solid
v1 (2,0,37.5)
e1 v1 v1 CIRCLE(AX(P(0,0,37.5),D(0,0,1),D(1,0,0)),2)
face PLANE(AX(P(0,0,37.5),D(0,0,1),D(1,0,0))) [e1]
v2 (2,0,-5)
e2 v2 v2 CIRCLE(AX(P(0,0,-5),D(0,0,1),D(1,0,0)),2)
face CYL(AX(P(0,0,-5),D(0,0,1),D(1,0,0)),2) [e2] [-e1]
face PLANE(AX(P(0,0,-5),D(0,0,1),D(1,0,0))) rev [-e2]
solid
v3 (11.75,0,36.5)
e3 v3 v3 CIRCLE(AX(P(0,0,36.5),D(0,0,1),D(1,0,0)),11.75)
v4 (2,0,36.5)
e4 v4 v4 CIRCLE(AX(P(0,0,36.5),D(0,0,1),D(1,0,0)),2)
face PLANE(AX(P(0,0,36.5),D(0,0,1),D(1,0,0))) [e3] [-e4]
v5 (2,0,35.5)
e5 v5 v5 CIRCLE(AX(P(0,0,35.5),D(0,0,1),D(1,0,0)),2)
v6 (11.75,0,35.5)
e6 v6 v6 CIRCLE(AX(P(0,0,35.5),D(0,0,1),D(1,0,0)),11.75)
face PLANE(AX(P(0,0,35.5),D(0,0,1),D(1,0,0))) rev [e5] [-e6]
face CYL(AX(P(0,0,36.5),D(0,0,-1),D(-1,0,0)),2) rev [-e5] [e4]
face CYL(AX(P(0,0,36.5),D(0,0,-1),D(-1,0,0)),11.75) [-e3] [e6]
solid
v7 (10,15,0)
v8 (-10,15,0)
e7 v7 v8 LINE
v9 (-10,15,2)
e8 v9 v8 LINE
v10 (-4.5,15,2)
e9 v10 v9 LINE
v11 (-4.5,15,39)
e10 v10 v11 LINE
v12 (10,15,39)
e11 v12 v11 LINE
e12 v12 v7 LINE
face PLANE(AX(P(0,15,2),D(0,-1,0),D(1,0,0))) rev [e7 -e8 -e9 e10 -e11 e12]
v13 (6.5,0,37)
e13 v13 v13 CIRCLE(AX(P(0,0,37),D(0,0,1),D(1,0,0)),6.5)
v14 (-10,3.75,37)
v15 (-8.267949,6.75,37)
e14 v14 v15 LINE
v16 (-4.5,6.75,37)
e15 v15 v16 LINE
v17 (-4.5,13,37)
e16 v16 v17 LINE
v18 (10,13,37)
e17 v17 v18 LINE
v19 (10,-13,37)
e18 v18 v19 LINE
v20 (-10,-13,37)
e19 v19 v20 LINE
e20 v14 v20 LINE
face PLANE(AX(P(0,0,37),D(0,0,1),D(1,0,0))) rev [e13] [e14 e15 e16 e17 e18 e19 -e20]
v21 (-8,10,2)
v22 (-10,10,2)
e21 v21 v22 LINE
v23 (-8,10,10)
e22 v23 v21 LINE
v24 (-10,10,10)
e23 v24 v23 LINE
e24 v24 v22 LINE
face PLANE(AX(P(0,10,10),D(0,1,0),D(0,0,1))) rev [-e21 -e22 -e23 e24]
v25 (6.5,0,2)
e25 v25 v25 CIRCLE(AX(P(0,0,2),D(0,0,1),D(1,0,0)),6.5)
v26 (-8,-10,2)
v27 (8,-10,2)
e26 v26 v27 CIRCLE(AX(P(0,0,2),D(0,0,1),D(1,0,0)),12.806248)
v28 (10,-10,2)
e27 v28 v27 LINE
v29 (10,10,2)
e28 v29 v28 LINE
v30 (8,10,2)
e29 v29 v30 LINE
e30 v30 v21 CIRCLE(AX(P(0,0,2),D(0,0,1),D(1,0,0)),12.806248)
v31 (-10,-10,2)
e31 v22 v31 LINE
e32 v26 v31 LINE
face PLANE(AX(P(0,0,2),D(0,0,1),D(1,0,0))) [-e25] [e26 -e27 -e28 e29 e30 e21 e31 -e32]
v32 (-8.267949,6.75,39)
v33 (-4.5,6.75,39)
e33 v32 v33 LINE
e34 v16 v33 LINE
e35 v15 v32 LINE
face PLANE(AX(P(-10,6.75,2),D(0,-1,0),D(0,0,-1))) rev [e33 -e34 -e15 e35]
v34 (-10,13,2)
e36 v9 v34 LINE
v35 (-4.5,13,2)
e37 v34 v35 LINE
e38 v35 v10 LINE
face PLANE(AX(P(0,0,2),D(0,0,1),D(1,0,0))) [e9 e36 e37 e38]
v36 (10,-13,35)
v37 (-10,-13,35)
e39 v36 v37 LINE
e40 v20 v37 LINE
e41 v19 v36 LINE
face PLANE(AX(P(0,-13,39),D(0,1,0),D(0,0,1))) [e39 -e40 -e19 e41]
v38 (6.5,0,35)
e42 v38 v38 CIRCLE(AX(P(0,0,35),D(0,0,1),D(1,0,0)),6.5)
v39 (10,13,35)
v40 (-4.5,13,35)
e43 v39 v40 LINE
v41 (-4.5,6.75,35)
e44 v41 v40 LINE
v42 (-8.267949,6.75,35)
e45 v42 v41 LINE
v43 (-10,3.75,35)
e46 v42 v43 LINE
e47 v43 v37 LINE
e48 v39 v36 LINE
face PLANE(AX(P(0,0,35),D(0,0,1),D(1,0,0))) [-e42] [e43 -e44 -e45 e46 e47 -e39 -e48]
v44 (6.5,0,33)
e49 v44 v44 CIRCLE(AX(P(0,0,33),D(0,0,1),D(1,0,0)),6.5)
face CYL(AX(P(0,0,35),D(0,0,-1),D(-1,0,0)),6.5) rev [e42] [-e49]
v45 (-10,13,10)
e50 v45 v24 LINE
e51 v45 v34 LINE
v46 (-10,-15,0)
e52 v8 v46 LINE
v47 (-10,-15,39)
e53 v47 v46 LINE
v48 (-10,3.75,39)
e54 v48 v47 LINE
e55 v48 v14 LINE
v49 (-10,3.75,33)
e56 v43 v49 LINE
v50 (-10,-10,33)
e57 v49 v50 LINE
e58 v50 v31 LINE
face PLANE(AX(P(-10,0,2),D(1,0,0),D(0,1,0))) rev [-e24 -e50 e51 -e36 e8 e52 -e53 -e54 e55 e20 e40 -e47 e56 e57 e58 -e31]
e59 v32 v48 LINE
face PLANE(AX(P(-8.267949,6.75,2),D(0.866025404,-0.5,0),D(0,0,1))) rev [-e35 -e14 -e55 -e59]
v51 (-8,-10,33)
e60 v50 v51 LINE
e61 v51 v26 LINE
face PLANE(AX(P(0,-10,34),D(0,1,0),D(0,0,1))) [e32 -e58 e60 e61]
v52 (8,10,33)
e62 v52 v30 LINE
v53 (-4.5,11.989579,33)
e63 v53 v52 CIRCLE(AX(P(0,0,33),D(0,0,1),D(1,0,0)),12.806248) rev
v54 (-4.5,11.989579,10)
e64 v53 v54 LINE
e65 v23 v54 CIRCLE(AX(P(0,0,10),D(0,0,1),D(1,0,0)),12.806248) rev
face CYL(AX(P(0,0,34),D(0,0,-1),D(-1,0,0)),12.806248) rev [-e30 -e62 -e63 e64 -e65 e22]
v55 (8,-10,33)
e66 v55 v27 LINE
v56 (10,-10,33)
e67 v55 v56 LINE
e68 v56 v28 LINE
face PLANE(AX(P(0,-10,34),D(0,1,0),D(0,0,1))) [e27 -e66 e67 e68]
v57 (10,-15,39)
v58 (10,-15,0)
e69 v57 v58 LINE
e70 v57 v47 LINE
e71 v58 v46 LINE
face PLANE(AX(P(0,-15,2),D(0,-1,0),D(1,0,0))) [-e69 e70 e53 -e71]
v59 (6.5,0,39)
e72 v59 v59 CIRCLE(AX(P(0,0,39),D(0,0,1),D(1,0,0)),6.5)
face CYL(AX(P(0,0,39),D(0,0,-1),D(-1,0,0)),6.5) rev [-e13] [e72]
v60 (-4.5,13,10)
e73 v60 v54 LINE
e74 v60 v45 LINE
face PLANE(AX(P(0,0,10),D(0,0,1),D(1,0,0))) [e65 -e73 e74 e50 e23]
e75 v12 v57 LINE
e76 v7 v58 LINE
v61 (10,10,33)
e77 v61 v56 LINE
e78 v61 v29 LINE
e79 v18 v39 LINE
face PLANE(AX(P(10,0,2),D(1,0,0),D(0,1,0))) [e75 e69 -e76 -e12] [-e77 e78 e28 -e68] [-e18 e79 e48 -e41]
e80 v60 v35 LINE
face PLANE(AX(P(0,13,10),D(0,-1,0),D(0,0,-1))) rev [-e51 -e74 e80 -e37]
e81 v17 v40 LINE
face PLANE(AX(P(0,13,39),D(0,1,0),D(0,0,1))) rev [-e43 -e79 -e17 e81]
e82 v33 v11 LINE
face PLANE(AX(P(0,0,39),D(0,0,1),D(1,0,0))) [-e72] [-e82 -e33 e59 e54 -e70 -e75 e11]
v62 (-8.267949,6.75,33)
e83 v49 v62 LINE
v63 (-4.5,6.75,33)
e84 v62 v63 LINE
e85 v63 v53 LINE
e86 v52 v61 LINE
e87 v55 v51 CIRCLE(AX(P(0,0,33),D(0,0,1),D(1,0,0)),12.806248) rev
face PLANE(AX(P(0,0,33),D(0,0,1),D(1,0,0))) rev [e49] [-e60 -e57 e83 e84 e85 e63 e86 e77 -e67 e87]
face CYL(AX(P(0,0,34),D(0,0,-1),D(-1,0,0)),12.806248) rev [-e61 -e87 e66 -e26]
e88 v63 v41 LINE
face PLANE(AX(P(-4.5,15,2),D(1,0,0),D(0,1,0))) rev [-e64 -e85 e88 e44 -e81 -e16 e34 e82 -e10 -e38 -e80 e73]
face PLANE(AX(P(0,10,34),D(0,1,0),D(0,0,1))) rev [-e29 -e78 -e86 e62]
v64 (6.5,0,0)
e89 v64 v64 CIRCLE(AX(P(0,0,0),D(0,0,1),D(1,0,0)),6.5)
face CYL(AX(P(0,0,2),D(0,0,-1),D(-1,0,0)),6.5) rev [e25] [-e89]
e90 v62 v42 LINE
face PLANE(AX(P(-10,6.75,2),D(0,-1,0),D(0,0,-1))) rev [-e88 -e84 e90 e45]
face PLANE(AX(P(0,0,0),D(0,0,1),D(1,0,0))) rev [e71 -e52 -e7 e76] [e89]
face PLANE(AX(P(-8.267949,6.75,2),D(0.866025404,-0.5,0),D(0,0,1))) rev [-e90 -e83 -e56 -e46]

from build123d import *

# Parameters (mm, degrees)
SKETCH1_W                = 20
SKETCH1_H                = 30
SKETCH1_R                = 6.5
BOSS_EXTRUDE1_DEPTH      = 2
BOSS_EXTRUDE4_DEPTH      = 34
BOSS_EXTRUDE5_START      = 37
SKETCH1_9_W              = 20
SKETCH1_9_H              = 30
SKETCH1_9_R              = 6.5
BOSS_EXTRUDE5_DEPTH      = 2
BOSS_EXTRUDE6_START      = 33
SKETCH1_10_W             = 20
SKETCH1_10_H             = 30
SKETCH1_10_R             = 6.5
BOSS_EXTRUDE6_DEPTH      = 2
SKETCH1_11_W             = 20
SKETCH1_11_H             = 2
BOSS_EXTRUDE7_DEPTH      = 39
SKETCH2_W                = 5.5
SKETCH2_H                = 8.25
CUT_EXTRUDE1_DEPTH       = 37
BOSS_EXTRUDE10_DEPTH     = 10
BOSS_EXTRUDE8_START      = 35.5
SKETCH4_R                = 11.75
SKETCH4_R_2              = 2
BOSS_EXTRUDE8_DEPTH      = 1
BOSS_EXTRUDE9_DEPTH      = 37.5
BOSS_EXTRUDE9_DEPTH_BACK = 5
SKETCH4_2_R              = 2
CHAMFER3_SIZE            = 3
CHAMFER3_SIZE2           = 1.732050808


with BuildPart() as part:
    # Sketch1 → Boss-Extrude1 (new body)
    with BuildSketch(Plane.XY):
        Rectangle(SKETCH1_W, SKETCH1_H)
        Circle(SKETCH1_R, mode=Mode.SUBTRACT)
    extrude(amount=BOSS_EXTRUDE1_DEPTH)

    # Sketch1<7> → Boss-Extrude4 (add)
    with BuildSketch(Plane.XY):
        with BuildLine():
            Line((10, 15), (-10, 15))
            Line((-10, 15), (-10, 10))
            Line((-10, 10), (-8, 10))
            ThreePointArc((-8, 10), (0, 12.806248475), (8, 10))
            Line((8, 10), (10, 10))
            Line((10, 10), (10, 15))
        make_face()
        with BuildLine():
            Line((10, -10), (8, -10))
            ThreePointArc((8, -10), (0, -12.806248475), (-8, -10))
            Line((-8, -10), (-10, -10))
            Line((-10, -10), (-10, -15))
            Line((-10, -15), (10, -15))
            Line((10, -15), (10, -10))
        make_face()
    extrude(amount=BOSS_EXTRUDE4_DEPTH)

    # Sketch1<10> → Boss-Extrude6 (add)
    with BuildSketch(Plane.XY.offset(BOSS_EXTRUDE6_START)):
        Rectangle(SKETCH1_10_W, SKETCH1_10_H)
        Circle(SKETCH1_10_R, mode=Mode.SUBTRACT)
    extrude(amount=BOSS_EXTRUDE6_DEPTH)



with BuildPart() as body_2:
    # Sketch1<9> → Boss-Extrude5 (new body)
    with BuildSketch(Plane.XY.offset(BOSS_EXTRUDE5_START)):
        Rectangle(SKETCH1_9_W, SKETCH1_9_H)
        Circle(SKETCH1_9_R, mode=Mode.SUBTRACT)
    extrude(amount=BOSS_EXTRUDE5_DEPTH)


with BuildPart() as part_1:
    add(part.part)

    add(body_2.part)  # Boss-Extrude7 merges body 2
    # Sketch1<11> → Boss-Extrude7 (add)
    with BuildSketch(Plane.XY):
        with Locations((0, 14)):
            Rectangle(SKETCH1_11_W, SKETCH1_11_H)
        with Locations((0, -14)):
            Rectangle(SKETCH1_11_W, SKETCH1_11_H)
    extrude(amount=BOSS_EXTRUDE7_DEPTH)

    # Sketch2 → Cut-Extrude1 (cut)
    with BuildSketch(Plane.XY.offset(39)):
        with Locations((-7.25, 10.875)):
            Rectangle(SKETCH2_W, SKETCH2_H)
    extrude(amount=-CUT_EXTRUDE1_DEPTH, mode=Mode.SUBTRACT)

    # Sketch1<12> → Boss-Extrude10 (add)
    with BuildSketch(Plane.XY):
        with BuildLine():
            Line((-10, 13), (-10, 10))
            Line((-10, 10), (-8, 10))
            ThreePointArc((-8, 10), (0, 12.806248475), (8, 10))
            Line((8, 10), (8, 13))
            Line((8, 13), (-10, 13))
        make_face()
    extrude(amount=BOSS_EXTRUDE10_DEPTH)

    # Chamfer3
    chamfer3_edges = [part_1.edges().sort_by_distance(p)[0] for p in [
        (-10, 6.75, 34),
        (-10, 6.75, 38),
    ]]
    chamfer3_side = [part_1.faces().sort_by_distance(p)[0] for p in [
        (-10, 14, 1.507963416),
    ]]
    chamfer(chamfer3_edges, length=CHAMFER3_SIZE, length2=CHAMFER3_SIZE2, reference=chamfer3_side[0])


with BuildPart() as body_2_2:
    # Sketch4 → Boss-Extrude8 (new body)
    with BuildSketch(Plane.XY.offset(BOSS_EXTRUDE8_START)):
        Circle(SKETCH4_R)
        Circle(SKETCH4_R_2, mode=Mode.SUBTRACT)
    extrude(amount=BOSS_EXTRUDE8_DEPTH)


with BuildPart() as body_3:
    # Sketch4<2> → Boss-Extrude9 (new, two sides: drawn at the far end of the back side and taken through both)
    with BuildSketch(Plane.XY.offset(-BOSS_EXTRUDE9_DEPTH_BACK)):
        Circle(SKETCH4_2_R)
    extrude(amount=BOSS_EXTRUDE9_DEPTH + BOSS_EXTRUDE9_DEPTH_BACK)


solid = Compound([part_1.part, body_2_2.part, body_3.part])
